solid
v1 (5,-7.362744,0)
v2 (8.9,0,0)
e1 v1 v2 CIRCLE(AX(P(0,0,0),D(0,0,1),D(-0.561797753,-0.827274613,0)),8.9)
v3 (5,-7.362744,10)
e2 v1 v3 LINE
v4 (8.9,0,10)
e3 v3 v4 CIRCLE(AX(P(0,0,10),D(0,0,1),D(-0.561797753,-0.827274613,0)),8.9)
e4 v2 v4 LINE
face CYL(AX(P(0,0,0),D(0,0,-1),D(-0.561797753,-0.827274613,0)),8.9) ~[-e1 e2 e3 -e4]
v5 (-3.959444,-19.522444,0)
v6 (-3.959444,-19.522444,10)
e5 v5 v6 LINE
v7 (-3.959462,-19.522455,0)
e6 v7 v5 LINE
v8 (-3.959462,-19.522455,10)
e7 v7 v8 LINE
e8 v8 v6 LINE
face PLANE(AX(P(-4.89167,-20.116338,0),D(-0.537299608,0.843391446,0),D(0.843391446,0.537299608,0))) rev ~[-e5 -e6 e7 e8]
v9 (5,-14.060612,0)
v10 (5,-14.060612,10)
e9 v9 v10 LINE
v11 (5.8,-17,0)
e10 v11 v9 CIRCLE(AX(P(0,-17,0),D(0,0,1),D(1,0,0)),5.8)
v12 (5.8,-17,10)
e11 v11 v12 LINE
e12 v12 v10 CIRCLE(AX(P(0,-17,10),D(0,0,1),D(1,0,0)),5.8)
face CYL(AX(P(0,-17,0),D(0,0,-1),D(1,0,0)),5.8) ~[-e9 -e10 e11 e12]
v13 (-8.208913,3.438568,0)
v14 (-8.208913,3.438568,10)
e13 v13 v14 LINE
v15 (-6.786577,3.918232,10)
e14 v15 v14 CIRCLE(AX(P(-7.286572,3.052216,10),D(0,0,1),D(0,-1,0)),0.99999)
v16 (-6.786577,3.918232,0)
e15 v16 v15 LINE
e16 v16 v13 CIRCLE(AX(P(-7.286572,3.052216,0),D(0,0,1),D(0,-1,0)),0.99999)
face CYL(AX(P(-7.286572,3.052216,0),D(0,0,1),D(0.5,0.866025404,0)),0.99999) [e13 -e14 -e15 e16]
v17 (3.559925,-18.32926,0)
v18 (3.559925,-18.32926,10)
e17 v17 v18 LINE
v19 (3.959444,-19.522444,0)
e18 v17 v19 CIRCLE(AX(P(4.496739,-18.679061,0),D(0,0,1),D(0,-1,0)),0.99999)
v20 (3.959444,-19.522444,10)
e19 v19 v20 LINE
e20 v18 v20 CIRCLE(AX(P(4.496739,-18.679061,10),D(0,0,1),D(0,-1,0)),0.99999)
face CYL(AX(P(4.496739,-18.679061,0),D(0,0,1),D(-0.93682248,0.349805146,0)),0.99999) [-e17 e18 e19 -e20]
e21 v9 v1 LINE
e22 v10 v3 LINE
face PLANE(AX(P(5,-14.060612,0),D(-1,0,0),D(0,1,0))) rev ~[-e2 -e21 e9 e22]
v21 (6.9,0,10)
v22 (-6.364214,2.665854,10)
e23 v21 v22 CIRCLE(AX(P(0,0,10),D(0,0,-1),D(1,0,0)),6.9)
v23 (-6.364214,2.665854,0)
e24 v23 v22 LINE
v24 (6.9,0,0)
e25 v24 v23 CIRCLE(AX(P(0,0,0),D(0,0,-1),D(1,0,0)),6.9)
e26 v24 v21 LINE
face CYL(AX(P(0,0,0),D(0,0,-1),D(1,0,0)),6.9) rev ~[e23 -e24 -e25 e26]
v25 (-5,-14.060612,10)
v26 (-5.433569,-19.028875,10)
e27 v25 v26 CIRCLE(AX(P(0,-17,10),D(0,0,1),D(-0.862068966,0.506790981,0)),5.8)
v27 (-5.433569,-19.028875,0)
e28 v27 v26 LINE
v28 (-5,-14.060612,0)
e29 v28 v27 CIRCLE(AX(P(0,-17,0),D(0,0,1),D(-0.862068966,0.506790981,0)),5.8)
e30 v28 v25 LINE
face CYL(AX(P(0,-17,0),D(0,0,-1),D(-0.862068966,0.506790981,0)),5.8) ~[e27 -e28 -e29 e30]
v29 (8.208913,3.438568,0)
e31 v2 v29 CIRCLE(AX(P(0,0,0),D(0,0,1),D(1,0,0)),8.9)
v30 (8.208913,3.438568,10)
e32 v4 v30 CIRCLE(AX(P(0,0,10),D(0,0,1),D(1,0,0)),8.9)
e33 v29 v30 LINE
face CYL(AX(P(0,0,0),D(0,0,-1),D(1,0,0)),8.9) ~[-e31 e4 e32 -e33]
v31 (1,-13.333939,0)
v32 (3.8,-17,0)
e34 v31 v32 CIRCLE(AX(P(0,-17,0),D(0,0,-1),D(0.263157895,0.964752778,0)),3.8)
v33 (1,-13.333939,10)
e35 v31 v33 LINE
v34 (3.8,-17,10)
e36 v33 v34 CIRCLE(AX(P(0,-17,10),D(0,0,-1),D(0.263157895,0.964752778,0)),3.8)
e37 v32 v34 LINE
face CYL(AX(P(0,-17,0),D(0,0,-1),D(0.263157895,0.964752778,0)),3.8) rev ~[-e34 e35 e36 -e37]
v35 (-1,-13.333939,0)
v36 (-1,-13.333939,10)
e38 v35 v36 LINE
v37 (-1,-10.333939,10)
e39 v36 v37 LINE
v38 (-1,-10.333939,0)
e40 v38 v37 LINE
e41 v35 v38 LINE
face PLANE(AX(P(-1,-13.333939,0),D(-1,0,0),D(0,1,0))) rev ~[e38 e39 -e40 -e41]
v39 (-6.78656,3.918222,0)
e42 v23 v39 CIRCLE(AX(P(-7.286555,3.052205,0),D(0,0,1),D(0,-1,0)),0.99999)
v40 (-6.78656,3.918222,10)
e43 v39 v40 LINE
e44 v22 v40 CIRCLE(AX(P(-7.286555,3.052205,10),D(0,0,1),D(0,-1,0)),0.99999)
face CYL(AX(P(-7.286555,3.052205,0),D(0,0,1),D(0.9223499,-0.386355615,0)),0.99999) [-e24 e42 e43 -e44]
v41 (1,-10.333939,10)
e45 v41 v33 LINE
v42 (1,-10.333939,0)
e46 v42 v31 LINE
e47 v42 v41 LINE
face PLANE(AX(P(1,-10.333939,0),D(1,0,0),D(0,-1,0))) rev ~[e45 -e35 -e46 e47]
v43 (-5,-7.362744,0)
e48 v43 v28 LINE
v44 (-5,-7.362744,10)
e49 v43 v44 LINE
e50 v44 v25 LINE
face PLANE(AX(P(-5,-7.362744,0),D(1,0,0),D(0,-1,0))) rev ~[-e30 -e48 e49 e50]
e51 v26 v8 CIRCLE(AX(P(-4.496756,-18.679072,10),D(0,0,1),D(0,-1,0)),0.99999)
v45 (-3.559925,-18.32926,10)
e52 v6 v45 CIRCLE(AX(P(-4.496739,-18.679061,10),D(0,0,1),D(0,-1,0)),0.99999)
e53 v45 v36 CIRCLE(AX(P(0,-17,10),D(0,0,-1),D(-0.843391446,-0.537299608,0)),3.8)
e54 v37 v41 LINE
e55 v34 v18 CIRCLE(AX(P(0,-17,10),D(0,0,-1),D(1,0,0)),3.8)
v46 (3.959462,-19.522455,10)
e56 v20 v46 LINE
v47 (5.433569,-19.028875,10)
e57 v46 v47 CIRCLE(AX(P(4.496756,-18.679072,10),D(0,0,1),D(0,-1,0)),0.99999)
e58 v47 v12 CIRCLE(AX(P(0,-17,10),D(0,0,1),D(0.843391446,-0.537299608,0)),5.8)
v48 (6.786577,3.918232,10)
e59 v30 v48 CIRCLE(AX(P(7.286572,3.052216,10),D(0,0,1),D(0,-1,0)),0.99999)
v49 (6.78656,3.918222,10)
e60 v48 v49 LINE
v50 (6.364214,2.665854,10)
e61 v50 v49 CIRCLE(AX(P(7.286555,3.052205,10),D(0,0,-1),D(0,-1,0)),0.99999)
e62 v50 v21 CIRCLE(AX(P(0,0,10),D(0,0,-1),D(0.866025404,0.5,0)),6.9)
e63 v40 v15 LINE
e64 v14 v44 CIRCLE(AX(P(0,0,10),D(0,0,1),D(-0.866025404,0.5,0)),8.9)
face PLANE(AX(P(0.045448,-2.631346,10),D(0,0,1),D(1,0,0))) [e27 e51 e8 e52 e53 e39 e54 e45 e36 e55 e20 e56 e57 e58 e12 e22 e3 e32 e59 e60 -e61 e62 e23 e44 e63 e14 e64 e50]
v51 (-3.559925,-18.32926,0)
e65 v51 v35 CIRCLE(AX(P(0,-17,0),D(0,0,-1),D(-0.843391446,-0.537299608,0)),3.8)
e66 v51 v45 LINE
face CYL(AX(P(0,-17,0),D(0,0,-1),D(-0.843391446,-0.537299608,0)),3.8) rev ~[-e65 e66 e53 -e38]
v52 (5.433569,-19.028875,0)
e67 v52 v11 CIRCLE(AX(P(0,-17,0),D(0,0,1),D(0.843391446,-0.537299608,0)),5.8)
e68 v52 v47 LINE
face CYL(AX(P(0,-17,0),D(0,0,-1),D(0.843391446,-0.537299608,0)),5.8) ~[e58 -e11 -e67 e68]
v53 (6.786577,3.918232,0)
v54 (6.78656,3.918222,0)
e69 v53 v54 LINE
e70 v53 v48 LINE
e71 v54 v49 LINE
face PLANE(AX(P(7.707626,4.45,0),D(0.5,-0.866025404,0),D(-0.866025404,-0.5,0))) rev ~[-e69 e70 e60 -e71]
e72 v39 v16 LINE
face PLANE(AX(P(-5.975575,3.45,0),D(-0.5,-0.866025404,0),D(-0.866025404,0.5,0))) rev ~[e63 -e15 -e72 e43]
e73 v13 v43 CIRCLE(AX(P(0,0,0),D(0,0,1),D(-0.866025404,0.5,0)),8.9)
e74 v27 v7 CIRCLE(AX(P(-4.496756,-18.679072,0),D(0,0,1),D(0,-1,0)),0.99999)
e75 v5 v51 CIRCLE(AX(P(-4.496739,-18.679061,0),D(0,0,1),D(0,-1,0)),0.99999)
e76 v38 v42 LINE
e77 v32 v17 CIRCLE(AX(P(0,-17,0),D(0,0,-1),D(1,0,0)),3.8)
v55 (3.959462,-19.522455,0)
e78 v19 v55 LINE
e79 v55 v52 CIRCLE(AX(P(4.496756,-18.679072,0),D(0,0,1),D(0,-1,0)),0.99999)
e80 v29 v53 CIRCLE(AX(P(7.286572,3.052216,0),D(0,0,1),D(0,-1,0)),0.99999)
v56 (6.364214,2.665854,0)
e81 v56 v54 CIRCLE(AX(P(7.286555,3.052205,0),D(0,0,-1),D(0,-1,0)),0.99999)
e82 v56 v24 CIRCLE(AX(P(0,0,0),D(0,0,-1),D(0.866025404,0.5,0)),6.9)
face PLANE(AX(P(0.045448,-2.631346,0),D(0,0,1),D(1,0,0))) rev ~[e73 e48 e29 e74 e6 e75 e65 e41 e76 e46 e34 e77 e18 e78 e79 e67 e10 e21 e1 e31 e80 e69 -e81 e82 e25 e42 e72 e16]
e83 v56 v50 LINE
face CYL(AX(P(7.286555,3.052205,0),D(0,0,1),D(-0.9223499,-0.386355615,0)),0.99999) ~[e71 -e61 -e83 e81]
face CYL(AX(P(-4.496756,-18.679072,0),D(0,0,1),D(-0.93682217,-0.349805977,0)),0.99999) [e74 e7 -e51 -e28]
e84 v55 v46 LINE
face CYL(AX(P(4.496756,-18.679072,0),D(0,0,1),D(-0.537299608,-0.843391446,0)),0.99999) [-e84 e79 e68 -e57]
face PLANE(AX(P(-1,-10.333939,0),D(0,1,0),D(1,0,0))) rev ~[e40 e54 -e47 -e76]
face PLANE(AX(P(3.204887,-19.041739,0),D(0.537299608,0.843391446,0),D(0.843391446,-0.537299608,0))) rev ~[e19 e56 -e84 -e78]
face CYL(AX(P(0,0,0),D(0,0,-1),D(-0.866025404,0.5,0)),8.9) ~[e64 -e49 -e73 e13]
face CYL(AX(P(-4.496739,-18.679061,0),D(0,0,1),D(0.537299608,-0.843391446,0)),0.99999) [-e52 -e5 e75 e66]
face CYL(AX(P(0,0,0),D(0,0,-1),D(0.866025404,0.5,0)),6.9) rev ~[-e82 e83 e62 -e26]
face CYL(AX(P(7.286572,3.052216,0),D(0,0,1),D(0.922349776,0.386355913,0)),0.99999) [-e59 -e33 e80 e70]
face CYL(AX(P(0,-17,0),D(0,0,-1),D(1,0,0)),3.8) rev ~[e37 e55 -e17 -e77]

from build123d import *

# Parameters (mm, degrees)
F1_DEPTH = 10
F2_R     = 0.99999


# Not quite as in the source:
# - a fillet or chamfer is up to 0.001 mm smaller than in the source, because OpenCascade refuses the exact size


with BuildPart() as f1:
    # F0 (on Top) → F1 (new body)
    with BuildSketch(Plane.XY):
        with BuildLine():
            ThreePointArc((5.9755752861, 3.45), (6.6648882014, 1.7858514112), (6.9, 0))
            ThreePointArc((6.9, 0), (-1.7858514112, -6.6648882014), (-5.9755752861, 3.45))
            Line((-5.9755752861, 3.45), (-7.7076260937, 4.45))
            ThreePointArc((-7.7076260937, 4.45), (-8.6750314555, -1.9884238095), (-5, -7.3627440537))
            ThreePointArc((-5, -7.3627440537), (0, -8.9), (5, -7.3627440537))
            ThreePointArc((5, -7.3627440537), (7.8647949751, -4.1659332688), (8.9, 0))
            ThreePointArc((8.9, 0), (8.596739854, 2.3034895014), (7.7076260937, 4.45))
            Line((7.7076260937, 4.45), (5.9755752861, 3.45))
        make_face()
        with BuildLine():
            ThreePointArc((5, -7.3627440537), (0, -8.9), (-5, -7.3627440537))
            Line((-5, -7.3627440537), (-5, -14.0606123087))
            ThreePointArc((-5, -14.0606123087), (-3.30506116, -12.233809621), (-1, -11.2868572572))
            Line((-1, -11.2868572572), (-1, -10.333939444))
            Line((-1, -10.333939444), (1, -10.333939444))
            Line((1, -10.333939444), (1, -11.2868572572))
            ThreePointArc((1, -11.2868572572), (3.30506116, -12.233809621), (5, -14.0606123087))
            Line((5, -14.0606123087), (5, -7.3627440537))
        make_face()
        with BuildLine():
            ThreePointArc((-1, -11.2868572572), (-3.30506116, -12.233809621), (-5, -14.0606123087))
            ThreePointArc((-5, -14.0606123087), (-5.7990721969, -17.1037383981), (-4.8916703857, -20.1163377284))
            Line((-4.8916703857, -20.1163377284), (-3.2048874941, -19.0417385117))
            ThreePointArc((-3.2048874941, -19.0417385117), (-3.5447161041, -15.6306980825), (-1, -13.333939444))
            Line((-1, -13.333939444), (-1, -11.2868572572))
        make_face()
        with BuildLine():
            ThreePointArc((5.8, -17), (5.5964274319, -15.4768453788), (5, -14.0606123087))
            ThreePointArc((5, -14.0606123087), (3.30506116, -12.233809621), (1, -11.2868572572))
            Line((1, -11.2868572572), (1, -13.333939444))
            ThreePointArc((1, -13.333939444), (3.0199337741, -14.6934874811), (3.8, -17))
            ThreePointArc((3.8, -17), (3.6481894467, -18.0633502533), (3.2048874941, -19.0417385117))
            Line((3.2048874941, -19.0417385117), (4.8916703857, -20.1163377284))
            ThreePointArc((4.8916703857, -20.1163377284), (5.5682891554, -18.6230082814), (5.8, -17))
        make_face()
    extrude(amount=F1_DEPTH)

    # F2 (radius 1 in the source; OpenCascade refuses exactly that, so slightly less here)
    f2_edges = [f1.edges().sort_by_distance(p)[0] for p in [
        (-7.707626, 4.45, 5),
        (-5.975575, 3.45, 5),
        (5.975575, 3.45, 5),
        (7.707626, 4.45, 5),
        (-4.89167, -20.116338, 5),
        (-3.204887, -19.041739, 5),
        (4.89167, -20.116338, 5),
        (3.204887, -19.041739, 5),
    ]]
    fillet(f2_edges, radius=F2_R)


solid = f1.part
